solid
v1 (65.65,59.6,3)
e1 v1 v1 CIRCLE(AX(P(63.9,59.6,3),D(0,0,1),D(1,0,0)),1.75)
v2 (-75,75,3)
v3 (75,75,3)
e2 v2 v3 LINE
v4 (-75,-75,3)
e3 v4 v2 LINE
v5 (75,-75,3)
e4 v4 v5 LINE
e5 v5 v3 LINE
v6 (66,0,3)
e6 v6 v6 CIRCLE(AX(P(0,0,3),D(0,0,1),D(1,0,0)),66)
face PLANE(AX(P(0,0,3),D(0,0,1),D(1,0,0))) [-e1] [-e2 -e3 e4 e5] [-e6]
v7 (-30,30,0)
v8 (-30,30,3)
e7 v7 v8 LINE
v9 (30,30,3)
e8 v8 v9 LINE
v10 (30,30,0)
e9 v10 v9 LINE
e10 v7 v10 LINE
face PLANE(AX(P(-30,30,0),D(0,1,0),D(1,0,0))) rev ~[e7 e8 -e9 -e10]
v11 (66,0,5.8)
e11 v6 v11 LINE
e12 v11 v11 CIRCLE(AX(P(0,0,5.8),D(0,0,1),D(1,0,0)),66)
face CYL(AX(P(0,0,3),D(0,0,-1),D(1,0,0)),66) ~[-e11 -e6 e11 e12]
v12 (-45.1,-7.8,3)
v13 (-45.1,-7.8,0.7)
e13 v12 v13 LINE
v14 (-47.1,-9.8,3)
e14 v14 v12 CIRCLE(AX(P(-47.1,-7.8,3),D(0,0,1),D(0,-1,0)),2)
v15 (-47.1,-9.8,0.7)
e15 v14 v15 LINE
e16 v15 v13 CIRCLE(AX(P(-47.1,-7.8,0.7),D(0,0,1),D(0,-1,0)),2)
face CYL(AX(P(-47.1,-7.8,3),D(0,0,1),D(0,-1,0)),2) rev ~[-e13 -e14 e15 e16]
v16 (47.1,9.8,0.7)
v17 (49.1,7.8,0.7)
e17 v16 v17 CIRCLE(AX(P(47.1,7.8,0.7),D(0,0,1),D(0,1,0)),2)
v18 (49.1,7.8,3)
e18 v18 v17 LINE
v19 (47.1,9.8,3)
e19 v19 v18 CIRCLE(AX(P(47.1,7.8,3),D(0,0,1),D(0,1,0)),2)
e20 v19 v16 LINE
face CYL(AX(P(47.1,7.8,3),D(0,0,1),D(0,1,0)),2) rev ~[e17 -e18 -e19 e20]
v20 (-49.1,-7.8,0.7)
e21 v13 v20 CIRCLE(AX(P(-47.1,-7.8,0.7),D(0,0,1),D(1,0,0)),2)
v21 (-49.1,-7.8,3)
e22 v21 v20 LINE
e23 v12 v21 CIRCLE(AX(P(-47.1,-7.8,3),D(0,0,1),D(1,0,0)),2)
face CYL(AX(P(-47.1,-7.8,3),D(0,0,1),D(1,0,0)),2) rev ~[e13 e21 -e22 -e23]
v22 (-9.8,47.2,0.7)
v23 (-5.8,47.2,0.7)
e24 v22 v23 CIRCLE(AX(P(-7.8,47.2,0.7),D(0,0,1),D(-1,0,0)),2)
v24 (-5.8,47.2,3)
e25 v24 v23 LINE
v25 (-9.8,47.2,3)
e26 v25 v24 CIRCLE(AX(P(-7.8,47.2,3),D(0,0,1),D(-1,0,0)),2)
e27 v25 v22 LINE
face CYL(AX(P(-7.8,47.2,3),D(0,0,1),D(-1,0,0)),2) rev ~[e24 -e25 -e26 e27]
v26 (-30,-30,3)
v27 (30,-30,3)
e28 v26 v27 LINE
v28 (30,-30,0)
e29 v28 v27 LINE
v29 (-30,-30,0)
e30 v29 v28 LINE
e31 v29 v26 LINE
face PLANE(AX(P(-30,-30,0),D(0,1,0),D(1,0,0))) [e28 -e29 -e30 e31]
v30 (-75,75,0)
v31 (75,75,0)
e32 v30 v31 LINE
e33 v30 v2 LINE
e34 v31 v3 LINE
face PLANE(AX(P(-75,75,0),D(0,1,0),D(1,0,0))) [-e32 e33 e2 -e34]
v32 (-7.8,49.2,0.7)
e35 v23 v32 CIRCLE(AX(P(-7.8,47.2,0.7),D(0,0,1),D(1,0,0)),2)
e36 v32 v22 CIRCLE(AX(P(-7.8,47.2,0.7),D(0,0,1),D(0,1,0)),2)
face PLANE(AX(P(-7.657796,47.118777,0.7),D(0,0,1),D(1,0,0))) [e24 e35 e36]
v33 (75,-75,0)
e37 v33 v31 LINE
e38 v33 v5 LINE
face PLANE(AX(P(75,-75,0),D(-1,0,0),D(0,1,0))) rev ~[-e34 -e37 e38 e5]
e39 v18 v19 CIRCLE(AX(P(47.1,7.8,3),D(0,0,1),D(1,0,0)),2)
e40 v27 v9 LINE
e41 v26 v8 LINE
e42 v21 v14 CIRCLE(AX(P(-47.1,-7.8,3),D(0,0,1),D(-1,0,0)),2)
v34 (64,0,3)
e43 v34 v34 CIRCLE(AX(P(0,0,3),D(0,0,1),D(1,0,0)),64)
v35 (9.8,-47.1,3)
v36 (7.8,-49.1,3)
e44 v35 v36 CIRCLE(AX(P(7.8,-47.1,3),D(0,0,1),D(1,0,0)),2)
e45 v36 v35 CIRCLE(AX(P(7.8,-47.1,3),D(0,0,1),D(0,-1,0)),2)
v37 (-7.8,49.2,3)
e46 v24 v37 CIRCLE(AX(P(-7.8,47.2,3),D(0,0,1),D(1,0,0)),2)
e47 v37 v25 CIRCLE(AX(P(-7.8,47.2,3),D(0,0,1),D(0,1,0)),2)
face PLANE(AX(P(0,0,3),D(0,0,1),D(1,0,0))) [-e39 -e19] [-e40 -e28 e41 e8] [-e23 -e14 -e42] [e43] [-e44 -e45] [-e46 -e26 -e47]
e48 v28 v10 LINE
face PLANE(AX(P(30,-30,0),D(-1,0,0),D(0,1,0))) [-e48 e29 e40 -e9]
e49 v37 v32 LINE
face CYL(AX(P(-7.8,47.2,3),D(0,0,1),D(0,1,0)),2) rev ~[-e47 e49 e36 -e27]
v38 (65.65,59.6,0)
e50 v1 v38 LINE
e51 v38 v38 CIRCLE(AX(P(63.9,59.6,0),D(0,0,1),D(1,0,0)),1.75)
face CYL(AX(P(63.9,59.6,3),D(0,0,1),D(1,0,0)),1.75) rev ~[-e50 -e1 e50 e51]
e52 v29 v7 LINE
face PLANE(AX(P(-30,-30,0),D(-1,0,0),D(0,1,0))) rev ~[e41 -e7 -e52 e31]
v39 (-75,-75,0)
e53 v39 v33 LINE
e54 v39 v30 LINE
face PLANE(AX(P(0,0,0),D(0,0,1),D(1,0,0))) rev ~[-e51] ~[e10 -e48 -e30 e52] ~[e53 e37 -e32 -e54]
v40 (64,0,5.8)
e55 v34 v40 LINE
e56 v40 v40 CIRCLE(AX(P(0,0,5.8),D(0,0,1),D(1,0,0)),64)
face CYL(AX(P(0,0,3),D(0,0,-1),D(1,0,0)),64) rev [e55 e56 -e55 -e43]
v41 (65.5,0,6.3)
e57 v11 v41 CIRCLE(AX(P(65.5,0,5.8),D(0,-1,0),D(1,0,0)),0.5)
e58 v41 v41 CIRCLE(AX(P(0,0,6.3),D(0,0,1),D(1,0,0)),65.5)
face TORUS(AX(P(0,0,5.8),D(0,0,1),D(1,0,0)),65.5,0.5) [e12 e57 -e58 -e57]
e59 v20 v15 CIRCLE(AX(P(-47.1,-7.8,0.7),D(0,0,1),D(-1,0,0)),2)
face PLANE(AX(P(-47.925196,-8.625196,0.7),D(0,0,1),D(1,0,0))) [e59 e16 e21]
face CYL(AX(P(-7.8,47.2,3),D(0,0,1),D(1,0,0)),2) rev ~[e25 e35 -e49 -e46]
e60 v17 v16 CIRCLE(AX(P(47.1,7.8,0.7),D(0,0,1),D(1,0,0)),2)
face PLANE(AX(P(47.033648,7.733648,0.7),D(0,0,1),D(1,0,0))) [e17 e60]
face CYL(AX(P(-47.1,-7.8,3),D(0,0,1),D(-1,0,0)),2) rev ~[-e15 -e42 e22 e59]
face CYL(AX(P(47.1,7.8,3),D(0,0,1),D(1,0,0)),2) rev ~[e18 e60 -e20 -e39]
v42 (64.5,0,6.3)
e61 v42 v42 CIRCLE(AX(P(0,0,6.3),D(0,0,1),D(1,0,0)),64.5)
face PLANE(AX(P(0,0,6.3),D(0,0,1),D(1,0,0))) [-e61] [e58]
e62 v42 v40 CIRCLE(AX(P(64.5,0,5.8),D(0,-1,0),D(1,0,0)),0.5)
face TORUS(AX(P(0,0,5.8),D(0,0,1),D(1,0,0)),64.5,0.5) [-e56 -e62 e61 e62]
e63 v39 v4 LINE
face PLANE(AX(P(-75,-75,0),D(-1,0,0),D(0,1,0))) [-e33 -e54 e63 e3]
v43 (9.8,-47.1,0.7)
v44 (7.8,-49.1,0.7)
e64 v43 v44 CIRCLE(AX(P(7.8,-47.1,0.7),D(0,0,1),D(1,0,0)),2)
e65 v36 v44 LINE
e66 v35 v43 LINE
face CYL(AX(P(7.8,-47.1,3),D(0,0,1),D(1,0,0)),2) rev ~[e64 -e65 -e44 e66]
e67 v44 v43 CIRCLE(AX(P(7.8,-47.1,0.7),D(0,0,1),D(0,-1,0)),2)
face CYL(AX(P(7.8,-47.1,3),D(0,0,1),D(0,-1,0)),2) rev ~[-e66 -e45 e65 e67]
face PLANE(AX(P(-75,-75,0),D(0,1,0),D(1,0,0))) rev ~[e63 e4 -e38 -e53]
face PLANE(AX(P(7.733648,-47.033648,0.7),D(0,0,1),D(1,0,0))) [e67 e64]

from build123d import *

# Parameters (mm, degrees)
F0_W     = 150
F0_H     = 150
F0_W_2   = 60
F0_H_2   = 60
F1_DEPTH = 3
F2_R     = 66
F2_R_2   = 64
F3_DEPTH = 3.3
F5_DEPTH = 2.3
F6_R     = 0.5
F7_R     = 0.5
F4_R     = 1.75
F8_DEPTH = 25


# Not quite as in the source:
# - a feature names something its author has since deleted; it is built from what else it names


with BuildPart() as f1:
    # F0 (on Top) → F1 (new body)
    with BuildSketch(Plane.XY):
        Rectangle(F0_W, F0_H)
        Rectangle(F0_W_2, F0_H_2, mode=Mode.SUBTRACT)
    extrude(amount=F1_DEPTH)

    # F2 (on face) → F3 (join)
    with BuildSketch(Plane.XY.offset(3)):
        Circle(F2_R)
        Circle(F2_R_2, mode=Mode.SUBTRACT)
    extrude(amount=F3_DEPTH)

    # F4 (on face) → F5 (cut)
    with BuildSketch(Plane.XY.offset(3)):
        with BuildLine():
            ThreePointArc((-49.1, -7.8), (-48.5142135624, -9.2142135624), (-47.1, -9.8))
            Line((-47.1, -9.8), (-47.1, -7.8))
            Line((-47.1, -7.8), (-49.1, -7.8))
        make_face()
        with BuildLine():
            Line((-47.1, -7.8), (-47.1, -9.8))
            ThreePointArc((-47.1, -9.8), (-45.6857864376, -9.2142135624), (-45.1, -7.8))
            ThreePointArc((-45.1, -7.8), (-47.1, -5.8), (-49.1, -7.8))
            Line((-49.1, -7.8), (-47.1, -7.8))
        make_face()
        with BuildLine():
            Line((-7.8, 47.2), (-9.8, 47.2))
            ThreePointArc((-9.8, 47.2), (-7.8, 45.2), (-5.8, 47.2))
            ThreePointArc((-5.8, 47.2), (-6.3857864376, 48.6142135624), (-7.8, 49.2))
            Line((-7.8, 49.2), (-7.8, 47.2))
        make_face()
        with BuildLine():
            ThreePointArc((-7.8, 49.2), (-9.2142135624, 48.6142135624), (-9.8, 47.2))
            Line((-9.8, 47.2), (-7.8, 47.2))
            Line((-7.8, 47.2), (-7.8, 49.2))
        make_face()
        with BuildLine():
            Line((47.1, 7.8), (47.1, 9.8))
            ThreePointArc((47.1, 9.8), (45.6857864376, 6.3857864376), (49.1, 7.8))
            Line((49.1, 7.8), (47.1, 7.8))
        make_face()
        with BuildLine():
            ThreePointArc((49.1, 7.8), (48.5142135624, 9.2142135624), (47.1, 9.8))
            Line((47.1, 9.8), (47.1, 7.8))
            Line((47.1, 7.8), (49.1, 7.8))
        make_face()
        with BuildLine():
            ThreePointArc((9.8, -47.1), (6.3857864376, -45.6857864376), (7.8, -49.1))
            Line((7.8, -49.1), (7.8, -47.1))
            Line((7.8, -47.1), (9.8, -47.1))
        make_face()
        with BuildLine():
            Line((7.8, -47.1), (7.8, -49.1))
            ThreePointArc((7.8, -49.1), (9.2142135624, -48.5142135624), (9.8, -47.1))
            Line((9.8, -47.1), (7.8, -47.1))
        make_face()
    extrude(amount=-F5_DEPTH, mode=Mode.SUBTRACT)

    # F6
    f6_edges = [f1.edges().sort_by_distance(p)[0] for p in [
        (-66, 0, 6.3),
    ]]
    fillet(f6_edges, radius=F6_R)

    # F7
    f7_edges = [f1.edges().sort_by_distance(p)[0] for p in [
        (-64, 0, 6.3),
    ]]
    fillet(f7_edges, radius=F7_R)

    # F4 (on face) → F8 (cut)
    with BuildSketch(Plane.XY.offset(3)):
        with Locations((63.9, 59.6)):
            Circle(F4_R)
    extrude(amount=-F8_DEPTH, mode=Mode.SUBTRACT)


solid = f1.part
